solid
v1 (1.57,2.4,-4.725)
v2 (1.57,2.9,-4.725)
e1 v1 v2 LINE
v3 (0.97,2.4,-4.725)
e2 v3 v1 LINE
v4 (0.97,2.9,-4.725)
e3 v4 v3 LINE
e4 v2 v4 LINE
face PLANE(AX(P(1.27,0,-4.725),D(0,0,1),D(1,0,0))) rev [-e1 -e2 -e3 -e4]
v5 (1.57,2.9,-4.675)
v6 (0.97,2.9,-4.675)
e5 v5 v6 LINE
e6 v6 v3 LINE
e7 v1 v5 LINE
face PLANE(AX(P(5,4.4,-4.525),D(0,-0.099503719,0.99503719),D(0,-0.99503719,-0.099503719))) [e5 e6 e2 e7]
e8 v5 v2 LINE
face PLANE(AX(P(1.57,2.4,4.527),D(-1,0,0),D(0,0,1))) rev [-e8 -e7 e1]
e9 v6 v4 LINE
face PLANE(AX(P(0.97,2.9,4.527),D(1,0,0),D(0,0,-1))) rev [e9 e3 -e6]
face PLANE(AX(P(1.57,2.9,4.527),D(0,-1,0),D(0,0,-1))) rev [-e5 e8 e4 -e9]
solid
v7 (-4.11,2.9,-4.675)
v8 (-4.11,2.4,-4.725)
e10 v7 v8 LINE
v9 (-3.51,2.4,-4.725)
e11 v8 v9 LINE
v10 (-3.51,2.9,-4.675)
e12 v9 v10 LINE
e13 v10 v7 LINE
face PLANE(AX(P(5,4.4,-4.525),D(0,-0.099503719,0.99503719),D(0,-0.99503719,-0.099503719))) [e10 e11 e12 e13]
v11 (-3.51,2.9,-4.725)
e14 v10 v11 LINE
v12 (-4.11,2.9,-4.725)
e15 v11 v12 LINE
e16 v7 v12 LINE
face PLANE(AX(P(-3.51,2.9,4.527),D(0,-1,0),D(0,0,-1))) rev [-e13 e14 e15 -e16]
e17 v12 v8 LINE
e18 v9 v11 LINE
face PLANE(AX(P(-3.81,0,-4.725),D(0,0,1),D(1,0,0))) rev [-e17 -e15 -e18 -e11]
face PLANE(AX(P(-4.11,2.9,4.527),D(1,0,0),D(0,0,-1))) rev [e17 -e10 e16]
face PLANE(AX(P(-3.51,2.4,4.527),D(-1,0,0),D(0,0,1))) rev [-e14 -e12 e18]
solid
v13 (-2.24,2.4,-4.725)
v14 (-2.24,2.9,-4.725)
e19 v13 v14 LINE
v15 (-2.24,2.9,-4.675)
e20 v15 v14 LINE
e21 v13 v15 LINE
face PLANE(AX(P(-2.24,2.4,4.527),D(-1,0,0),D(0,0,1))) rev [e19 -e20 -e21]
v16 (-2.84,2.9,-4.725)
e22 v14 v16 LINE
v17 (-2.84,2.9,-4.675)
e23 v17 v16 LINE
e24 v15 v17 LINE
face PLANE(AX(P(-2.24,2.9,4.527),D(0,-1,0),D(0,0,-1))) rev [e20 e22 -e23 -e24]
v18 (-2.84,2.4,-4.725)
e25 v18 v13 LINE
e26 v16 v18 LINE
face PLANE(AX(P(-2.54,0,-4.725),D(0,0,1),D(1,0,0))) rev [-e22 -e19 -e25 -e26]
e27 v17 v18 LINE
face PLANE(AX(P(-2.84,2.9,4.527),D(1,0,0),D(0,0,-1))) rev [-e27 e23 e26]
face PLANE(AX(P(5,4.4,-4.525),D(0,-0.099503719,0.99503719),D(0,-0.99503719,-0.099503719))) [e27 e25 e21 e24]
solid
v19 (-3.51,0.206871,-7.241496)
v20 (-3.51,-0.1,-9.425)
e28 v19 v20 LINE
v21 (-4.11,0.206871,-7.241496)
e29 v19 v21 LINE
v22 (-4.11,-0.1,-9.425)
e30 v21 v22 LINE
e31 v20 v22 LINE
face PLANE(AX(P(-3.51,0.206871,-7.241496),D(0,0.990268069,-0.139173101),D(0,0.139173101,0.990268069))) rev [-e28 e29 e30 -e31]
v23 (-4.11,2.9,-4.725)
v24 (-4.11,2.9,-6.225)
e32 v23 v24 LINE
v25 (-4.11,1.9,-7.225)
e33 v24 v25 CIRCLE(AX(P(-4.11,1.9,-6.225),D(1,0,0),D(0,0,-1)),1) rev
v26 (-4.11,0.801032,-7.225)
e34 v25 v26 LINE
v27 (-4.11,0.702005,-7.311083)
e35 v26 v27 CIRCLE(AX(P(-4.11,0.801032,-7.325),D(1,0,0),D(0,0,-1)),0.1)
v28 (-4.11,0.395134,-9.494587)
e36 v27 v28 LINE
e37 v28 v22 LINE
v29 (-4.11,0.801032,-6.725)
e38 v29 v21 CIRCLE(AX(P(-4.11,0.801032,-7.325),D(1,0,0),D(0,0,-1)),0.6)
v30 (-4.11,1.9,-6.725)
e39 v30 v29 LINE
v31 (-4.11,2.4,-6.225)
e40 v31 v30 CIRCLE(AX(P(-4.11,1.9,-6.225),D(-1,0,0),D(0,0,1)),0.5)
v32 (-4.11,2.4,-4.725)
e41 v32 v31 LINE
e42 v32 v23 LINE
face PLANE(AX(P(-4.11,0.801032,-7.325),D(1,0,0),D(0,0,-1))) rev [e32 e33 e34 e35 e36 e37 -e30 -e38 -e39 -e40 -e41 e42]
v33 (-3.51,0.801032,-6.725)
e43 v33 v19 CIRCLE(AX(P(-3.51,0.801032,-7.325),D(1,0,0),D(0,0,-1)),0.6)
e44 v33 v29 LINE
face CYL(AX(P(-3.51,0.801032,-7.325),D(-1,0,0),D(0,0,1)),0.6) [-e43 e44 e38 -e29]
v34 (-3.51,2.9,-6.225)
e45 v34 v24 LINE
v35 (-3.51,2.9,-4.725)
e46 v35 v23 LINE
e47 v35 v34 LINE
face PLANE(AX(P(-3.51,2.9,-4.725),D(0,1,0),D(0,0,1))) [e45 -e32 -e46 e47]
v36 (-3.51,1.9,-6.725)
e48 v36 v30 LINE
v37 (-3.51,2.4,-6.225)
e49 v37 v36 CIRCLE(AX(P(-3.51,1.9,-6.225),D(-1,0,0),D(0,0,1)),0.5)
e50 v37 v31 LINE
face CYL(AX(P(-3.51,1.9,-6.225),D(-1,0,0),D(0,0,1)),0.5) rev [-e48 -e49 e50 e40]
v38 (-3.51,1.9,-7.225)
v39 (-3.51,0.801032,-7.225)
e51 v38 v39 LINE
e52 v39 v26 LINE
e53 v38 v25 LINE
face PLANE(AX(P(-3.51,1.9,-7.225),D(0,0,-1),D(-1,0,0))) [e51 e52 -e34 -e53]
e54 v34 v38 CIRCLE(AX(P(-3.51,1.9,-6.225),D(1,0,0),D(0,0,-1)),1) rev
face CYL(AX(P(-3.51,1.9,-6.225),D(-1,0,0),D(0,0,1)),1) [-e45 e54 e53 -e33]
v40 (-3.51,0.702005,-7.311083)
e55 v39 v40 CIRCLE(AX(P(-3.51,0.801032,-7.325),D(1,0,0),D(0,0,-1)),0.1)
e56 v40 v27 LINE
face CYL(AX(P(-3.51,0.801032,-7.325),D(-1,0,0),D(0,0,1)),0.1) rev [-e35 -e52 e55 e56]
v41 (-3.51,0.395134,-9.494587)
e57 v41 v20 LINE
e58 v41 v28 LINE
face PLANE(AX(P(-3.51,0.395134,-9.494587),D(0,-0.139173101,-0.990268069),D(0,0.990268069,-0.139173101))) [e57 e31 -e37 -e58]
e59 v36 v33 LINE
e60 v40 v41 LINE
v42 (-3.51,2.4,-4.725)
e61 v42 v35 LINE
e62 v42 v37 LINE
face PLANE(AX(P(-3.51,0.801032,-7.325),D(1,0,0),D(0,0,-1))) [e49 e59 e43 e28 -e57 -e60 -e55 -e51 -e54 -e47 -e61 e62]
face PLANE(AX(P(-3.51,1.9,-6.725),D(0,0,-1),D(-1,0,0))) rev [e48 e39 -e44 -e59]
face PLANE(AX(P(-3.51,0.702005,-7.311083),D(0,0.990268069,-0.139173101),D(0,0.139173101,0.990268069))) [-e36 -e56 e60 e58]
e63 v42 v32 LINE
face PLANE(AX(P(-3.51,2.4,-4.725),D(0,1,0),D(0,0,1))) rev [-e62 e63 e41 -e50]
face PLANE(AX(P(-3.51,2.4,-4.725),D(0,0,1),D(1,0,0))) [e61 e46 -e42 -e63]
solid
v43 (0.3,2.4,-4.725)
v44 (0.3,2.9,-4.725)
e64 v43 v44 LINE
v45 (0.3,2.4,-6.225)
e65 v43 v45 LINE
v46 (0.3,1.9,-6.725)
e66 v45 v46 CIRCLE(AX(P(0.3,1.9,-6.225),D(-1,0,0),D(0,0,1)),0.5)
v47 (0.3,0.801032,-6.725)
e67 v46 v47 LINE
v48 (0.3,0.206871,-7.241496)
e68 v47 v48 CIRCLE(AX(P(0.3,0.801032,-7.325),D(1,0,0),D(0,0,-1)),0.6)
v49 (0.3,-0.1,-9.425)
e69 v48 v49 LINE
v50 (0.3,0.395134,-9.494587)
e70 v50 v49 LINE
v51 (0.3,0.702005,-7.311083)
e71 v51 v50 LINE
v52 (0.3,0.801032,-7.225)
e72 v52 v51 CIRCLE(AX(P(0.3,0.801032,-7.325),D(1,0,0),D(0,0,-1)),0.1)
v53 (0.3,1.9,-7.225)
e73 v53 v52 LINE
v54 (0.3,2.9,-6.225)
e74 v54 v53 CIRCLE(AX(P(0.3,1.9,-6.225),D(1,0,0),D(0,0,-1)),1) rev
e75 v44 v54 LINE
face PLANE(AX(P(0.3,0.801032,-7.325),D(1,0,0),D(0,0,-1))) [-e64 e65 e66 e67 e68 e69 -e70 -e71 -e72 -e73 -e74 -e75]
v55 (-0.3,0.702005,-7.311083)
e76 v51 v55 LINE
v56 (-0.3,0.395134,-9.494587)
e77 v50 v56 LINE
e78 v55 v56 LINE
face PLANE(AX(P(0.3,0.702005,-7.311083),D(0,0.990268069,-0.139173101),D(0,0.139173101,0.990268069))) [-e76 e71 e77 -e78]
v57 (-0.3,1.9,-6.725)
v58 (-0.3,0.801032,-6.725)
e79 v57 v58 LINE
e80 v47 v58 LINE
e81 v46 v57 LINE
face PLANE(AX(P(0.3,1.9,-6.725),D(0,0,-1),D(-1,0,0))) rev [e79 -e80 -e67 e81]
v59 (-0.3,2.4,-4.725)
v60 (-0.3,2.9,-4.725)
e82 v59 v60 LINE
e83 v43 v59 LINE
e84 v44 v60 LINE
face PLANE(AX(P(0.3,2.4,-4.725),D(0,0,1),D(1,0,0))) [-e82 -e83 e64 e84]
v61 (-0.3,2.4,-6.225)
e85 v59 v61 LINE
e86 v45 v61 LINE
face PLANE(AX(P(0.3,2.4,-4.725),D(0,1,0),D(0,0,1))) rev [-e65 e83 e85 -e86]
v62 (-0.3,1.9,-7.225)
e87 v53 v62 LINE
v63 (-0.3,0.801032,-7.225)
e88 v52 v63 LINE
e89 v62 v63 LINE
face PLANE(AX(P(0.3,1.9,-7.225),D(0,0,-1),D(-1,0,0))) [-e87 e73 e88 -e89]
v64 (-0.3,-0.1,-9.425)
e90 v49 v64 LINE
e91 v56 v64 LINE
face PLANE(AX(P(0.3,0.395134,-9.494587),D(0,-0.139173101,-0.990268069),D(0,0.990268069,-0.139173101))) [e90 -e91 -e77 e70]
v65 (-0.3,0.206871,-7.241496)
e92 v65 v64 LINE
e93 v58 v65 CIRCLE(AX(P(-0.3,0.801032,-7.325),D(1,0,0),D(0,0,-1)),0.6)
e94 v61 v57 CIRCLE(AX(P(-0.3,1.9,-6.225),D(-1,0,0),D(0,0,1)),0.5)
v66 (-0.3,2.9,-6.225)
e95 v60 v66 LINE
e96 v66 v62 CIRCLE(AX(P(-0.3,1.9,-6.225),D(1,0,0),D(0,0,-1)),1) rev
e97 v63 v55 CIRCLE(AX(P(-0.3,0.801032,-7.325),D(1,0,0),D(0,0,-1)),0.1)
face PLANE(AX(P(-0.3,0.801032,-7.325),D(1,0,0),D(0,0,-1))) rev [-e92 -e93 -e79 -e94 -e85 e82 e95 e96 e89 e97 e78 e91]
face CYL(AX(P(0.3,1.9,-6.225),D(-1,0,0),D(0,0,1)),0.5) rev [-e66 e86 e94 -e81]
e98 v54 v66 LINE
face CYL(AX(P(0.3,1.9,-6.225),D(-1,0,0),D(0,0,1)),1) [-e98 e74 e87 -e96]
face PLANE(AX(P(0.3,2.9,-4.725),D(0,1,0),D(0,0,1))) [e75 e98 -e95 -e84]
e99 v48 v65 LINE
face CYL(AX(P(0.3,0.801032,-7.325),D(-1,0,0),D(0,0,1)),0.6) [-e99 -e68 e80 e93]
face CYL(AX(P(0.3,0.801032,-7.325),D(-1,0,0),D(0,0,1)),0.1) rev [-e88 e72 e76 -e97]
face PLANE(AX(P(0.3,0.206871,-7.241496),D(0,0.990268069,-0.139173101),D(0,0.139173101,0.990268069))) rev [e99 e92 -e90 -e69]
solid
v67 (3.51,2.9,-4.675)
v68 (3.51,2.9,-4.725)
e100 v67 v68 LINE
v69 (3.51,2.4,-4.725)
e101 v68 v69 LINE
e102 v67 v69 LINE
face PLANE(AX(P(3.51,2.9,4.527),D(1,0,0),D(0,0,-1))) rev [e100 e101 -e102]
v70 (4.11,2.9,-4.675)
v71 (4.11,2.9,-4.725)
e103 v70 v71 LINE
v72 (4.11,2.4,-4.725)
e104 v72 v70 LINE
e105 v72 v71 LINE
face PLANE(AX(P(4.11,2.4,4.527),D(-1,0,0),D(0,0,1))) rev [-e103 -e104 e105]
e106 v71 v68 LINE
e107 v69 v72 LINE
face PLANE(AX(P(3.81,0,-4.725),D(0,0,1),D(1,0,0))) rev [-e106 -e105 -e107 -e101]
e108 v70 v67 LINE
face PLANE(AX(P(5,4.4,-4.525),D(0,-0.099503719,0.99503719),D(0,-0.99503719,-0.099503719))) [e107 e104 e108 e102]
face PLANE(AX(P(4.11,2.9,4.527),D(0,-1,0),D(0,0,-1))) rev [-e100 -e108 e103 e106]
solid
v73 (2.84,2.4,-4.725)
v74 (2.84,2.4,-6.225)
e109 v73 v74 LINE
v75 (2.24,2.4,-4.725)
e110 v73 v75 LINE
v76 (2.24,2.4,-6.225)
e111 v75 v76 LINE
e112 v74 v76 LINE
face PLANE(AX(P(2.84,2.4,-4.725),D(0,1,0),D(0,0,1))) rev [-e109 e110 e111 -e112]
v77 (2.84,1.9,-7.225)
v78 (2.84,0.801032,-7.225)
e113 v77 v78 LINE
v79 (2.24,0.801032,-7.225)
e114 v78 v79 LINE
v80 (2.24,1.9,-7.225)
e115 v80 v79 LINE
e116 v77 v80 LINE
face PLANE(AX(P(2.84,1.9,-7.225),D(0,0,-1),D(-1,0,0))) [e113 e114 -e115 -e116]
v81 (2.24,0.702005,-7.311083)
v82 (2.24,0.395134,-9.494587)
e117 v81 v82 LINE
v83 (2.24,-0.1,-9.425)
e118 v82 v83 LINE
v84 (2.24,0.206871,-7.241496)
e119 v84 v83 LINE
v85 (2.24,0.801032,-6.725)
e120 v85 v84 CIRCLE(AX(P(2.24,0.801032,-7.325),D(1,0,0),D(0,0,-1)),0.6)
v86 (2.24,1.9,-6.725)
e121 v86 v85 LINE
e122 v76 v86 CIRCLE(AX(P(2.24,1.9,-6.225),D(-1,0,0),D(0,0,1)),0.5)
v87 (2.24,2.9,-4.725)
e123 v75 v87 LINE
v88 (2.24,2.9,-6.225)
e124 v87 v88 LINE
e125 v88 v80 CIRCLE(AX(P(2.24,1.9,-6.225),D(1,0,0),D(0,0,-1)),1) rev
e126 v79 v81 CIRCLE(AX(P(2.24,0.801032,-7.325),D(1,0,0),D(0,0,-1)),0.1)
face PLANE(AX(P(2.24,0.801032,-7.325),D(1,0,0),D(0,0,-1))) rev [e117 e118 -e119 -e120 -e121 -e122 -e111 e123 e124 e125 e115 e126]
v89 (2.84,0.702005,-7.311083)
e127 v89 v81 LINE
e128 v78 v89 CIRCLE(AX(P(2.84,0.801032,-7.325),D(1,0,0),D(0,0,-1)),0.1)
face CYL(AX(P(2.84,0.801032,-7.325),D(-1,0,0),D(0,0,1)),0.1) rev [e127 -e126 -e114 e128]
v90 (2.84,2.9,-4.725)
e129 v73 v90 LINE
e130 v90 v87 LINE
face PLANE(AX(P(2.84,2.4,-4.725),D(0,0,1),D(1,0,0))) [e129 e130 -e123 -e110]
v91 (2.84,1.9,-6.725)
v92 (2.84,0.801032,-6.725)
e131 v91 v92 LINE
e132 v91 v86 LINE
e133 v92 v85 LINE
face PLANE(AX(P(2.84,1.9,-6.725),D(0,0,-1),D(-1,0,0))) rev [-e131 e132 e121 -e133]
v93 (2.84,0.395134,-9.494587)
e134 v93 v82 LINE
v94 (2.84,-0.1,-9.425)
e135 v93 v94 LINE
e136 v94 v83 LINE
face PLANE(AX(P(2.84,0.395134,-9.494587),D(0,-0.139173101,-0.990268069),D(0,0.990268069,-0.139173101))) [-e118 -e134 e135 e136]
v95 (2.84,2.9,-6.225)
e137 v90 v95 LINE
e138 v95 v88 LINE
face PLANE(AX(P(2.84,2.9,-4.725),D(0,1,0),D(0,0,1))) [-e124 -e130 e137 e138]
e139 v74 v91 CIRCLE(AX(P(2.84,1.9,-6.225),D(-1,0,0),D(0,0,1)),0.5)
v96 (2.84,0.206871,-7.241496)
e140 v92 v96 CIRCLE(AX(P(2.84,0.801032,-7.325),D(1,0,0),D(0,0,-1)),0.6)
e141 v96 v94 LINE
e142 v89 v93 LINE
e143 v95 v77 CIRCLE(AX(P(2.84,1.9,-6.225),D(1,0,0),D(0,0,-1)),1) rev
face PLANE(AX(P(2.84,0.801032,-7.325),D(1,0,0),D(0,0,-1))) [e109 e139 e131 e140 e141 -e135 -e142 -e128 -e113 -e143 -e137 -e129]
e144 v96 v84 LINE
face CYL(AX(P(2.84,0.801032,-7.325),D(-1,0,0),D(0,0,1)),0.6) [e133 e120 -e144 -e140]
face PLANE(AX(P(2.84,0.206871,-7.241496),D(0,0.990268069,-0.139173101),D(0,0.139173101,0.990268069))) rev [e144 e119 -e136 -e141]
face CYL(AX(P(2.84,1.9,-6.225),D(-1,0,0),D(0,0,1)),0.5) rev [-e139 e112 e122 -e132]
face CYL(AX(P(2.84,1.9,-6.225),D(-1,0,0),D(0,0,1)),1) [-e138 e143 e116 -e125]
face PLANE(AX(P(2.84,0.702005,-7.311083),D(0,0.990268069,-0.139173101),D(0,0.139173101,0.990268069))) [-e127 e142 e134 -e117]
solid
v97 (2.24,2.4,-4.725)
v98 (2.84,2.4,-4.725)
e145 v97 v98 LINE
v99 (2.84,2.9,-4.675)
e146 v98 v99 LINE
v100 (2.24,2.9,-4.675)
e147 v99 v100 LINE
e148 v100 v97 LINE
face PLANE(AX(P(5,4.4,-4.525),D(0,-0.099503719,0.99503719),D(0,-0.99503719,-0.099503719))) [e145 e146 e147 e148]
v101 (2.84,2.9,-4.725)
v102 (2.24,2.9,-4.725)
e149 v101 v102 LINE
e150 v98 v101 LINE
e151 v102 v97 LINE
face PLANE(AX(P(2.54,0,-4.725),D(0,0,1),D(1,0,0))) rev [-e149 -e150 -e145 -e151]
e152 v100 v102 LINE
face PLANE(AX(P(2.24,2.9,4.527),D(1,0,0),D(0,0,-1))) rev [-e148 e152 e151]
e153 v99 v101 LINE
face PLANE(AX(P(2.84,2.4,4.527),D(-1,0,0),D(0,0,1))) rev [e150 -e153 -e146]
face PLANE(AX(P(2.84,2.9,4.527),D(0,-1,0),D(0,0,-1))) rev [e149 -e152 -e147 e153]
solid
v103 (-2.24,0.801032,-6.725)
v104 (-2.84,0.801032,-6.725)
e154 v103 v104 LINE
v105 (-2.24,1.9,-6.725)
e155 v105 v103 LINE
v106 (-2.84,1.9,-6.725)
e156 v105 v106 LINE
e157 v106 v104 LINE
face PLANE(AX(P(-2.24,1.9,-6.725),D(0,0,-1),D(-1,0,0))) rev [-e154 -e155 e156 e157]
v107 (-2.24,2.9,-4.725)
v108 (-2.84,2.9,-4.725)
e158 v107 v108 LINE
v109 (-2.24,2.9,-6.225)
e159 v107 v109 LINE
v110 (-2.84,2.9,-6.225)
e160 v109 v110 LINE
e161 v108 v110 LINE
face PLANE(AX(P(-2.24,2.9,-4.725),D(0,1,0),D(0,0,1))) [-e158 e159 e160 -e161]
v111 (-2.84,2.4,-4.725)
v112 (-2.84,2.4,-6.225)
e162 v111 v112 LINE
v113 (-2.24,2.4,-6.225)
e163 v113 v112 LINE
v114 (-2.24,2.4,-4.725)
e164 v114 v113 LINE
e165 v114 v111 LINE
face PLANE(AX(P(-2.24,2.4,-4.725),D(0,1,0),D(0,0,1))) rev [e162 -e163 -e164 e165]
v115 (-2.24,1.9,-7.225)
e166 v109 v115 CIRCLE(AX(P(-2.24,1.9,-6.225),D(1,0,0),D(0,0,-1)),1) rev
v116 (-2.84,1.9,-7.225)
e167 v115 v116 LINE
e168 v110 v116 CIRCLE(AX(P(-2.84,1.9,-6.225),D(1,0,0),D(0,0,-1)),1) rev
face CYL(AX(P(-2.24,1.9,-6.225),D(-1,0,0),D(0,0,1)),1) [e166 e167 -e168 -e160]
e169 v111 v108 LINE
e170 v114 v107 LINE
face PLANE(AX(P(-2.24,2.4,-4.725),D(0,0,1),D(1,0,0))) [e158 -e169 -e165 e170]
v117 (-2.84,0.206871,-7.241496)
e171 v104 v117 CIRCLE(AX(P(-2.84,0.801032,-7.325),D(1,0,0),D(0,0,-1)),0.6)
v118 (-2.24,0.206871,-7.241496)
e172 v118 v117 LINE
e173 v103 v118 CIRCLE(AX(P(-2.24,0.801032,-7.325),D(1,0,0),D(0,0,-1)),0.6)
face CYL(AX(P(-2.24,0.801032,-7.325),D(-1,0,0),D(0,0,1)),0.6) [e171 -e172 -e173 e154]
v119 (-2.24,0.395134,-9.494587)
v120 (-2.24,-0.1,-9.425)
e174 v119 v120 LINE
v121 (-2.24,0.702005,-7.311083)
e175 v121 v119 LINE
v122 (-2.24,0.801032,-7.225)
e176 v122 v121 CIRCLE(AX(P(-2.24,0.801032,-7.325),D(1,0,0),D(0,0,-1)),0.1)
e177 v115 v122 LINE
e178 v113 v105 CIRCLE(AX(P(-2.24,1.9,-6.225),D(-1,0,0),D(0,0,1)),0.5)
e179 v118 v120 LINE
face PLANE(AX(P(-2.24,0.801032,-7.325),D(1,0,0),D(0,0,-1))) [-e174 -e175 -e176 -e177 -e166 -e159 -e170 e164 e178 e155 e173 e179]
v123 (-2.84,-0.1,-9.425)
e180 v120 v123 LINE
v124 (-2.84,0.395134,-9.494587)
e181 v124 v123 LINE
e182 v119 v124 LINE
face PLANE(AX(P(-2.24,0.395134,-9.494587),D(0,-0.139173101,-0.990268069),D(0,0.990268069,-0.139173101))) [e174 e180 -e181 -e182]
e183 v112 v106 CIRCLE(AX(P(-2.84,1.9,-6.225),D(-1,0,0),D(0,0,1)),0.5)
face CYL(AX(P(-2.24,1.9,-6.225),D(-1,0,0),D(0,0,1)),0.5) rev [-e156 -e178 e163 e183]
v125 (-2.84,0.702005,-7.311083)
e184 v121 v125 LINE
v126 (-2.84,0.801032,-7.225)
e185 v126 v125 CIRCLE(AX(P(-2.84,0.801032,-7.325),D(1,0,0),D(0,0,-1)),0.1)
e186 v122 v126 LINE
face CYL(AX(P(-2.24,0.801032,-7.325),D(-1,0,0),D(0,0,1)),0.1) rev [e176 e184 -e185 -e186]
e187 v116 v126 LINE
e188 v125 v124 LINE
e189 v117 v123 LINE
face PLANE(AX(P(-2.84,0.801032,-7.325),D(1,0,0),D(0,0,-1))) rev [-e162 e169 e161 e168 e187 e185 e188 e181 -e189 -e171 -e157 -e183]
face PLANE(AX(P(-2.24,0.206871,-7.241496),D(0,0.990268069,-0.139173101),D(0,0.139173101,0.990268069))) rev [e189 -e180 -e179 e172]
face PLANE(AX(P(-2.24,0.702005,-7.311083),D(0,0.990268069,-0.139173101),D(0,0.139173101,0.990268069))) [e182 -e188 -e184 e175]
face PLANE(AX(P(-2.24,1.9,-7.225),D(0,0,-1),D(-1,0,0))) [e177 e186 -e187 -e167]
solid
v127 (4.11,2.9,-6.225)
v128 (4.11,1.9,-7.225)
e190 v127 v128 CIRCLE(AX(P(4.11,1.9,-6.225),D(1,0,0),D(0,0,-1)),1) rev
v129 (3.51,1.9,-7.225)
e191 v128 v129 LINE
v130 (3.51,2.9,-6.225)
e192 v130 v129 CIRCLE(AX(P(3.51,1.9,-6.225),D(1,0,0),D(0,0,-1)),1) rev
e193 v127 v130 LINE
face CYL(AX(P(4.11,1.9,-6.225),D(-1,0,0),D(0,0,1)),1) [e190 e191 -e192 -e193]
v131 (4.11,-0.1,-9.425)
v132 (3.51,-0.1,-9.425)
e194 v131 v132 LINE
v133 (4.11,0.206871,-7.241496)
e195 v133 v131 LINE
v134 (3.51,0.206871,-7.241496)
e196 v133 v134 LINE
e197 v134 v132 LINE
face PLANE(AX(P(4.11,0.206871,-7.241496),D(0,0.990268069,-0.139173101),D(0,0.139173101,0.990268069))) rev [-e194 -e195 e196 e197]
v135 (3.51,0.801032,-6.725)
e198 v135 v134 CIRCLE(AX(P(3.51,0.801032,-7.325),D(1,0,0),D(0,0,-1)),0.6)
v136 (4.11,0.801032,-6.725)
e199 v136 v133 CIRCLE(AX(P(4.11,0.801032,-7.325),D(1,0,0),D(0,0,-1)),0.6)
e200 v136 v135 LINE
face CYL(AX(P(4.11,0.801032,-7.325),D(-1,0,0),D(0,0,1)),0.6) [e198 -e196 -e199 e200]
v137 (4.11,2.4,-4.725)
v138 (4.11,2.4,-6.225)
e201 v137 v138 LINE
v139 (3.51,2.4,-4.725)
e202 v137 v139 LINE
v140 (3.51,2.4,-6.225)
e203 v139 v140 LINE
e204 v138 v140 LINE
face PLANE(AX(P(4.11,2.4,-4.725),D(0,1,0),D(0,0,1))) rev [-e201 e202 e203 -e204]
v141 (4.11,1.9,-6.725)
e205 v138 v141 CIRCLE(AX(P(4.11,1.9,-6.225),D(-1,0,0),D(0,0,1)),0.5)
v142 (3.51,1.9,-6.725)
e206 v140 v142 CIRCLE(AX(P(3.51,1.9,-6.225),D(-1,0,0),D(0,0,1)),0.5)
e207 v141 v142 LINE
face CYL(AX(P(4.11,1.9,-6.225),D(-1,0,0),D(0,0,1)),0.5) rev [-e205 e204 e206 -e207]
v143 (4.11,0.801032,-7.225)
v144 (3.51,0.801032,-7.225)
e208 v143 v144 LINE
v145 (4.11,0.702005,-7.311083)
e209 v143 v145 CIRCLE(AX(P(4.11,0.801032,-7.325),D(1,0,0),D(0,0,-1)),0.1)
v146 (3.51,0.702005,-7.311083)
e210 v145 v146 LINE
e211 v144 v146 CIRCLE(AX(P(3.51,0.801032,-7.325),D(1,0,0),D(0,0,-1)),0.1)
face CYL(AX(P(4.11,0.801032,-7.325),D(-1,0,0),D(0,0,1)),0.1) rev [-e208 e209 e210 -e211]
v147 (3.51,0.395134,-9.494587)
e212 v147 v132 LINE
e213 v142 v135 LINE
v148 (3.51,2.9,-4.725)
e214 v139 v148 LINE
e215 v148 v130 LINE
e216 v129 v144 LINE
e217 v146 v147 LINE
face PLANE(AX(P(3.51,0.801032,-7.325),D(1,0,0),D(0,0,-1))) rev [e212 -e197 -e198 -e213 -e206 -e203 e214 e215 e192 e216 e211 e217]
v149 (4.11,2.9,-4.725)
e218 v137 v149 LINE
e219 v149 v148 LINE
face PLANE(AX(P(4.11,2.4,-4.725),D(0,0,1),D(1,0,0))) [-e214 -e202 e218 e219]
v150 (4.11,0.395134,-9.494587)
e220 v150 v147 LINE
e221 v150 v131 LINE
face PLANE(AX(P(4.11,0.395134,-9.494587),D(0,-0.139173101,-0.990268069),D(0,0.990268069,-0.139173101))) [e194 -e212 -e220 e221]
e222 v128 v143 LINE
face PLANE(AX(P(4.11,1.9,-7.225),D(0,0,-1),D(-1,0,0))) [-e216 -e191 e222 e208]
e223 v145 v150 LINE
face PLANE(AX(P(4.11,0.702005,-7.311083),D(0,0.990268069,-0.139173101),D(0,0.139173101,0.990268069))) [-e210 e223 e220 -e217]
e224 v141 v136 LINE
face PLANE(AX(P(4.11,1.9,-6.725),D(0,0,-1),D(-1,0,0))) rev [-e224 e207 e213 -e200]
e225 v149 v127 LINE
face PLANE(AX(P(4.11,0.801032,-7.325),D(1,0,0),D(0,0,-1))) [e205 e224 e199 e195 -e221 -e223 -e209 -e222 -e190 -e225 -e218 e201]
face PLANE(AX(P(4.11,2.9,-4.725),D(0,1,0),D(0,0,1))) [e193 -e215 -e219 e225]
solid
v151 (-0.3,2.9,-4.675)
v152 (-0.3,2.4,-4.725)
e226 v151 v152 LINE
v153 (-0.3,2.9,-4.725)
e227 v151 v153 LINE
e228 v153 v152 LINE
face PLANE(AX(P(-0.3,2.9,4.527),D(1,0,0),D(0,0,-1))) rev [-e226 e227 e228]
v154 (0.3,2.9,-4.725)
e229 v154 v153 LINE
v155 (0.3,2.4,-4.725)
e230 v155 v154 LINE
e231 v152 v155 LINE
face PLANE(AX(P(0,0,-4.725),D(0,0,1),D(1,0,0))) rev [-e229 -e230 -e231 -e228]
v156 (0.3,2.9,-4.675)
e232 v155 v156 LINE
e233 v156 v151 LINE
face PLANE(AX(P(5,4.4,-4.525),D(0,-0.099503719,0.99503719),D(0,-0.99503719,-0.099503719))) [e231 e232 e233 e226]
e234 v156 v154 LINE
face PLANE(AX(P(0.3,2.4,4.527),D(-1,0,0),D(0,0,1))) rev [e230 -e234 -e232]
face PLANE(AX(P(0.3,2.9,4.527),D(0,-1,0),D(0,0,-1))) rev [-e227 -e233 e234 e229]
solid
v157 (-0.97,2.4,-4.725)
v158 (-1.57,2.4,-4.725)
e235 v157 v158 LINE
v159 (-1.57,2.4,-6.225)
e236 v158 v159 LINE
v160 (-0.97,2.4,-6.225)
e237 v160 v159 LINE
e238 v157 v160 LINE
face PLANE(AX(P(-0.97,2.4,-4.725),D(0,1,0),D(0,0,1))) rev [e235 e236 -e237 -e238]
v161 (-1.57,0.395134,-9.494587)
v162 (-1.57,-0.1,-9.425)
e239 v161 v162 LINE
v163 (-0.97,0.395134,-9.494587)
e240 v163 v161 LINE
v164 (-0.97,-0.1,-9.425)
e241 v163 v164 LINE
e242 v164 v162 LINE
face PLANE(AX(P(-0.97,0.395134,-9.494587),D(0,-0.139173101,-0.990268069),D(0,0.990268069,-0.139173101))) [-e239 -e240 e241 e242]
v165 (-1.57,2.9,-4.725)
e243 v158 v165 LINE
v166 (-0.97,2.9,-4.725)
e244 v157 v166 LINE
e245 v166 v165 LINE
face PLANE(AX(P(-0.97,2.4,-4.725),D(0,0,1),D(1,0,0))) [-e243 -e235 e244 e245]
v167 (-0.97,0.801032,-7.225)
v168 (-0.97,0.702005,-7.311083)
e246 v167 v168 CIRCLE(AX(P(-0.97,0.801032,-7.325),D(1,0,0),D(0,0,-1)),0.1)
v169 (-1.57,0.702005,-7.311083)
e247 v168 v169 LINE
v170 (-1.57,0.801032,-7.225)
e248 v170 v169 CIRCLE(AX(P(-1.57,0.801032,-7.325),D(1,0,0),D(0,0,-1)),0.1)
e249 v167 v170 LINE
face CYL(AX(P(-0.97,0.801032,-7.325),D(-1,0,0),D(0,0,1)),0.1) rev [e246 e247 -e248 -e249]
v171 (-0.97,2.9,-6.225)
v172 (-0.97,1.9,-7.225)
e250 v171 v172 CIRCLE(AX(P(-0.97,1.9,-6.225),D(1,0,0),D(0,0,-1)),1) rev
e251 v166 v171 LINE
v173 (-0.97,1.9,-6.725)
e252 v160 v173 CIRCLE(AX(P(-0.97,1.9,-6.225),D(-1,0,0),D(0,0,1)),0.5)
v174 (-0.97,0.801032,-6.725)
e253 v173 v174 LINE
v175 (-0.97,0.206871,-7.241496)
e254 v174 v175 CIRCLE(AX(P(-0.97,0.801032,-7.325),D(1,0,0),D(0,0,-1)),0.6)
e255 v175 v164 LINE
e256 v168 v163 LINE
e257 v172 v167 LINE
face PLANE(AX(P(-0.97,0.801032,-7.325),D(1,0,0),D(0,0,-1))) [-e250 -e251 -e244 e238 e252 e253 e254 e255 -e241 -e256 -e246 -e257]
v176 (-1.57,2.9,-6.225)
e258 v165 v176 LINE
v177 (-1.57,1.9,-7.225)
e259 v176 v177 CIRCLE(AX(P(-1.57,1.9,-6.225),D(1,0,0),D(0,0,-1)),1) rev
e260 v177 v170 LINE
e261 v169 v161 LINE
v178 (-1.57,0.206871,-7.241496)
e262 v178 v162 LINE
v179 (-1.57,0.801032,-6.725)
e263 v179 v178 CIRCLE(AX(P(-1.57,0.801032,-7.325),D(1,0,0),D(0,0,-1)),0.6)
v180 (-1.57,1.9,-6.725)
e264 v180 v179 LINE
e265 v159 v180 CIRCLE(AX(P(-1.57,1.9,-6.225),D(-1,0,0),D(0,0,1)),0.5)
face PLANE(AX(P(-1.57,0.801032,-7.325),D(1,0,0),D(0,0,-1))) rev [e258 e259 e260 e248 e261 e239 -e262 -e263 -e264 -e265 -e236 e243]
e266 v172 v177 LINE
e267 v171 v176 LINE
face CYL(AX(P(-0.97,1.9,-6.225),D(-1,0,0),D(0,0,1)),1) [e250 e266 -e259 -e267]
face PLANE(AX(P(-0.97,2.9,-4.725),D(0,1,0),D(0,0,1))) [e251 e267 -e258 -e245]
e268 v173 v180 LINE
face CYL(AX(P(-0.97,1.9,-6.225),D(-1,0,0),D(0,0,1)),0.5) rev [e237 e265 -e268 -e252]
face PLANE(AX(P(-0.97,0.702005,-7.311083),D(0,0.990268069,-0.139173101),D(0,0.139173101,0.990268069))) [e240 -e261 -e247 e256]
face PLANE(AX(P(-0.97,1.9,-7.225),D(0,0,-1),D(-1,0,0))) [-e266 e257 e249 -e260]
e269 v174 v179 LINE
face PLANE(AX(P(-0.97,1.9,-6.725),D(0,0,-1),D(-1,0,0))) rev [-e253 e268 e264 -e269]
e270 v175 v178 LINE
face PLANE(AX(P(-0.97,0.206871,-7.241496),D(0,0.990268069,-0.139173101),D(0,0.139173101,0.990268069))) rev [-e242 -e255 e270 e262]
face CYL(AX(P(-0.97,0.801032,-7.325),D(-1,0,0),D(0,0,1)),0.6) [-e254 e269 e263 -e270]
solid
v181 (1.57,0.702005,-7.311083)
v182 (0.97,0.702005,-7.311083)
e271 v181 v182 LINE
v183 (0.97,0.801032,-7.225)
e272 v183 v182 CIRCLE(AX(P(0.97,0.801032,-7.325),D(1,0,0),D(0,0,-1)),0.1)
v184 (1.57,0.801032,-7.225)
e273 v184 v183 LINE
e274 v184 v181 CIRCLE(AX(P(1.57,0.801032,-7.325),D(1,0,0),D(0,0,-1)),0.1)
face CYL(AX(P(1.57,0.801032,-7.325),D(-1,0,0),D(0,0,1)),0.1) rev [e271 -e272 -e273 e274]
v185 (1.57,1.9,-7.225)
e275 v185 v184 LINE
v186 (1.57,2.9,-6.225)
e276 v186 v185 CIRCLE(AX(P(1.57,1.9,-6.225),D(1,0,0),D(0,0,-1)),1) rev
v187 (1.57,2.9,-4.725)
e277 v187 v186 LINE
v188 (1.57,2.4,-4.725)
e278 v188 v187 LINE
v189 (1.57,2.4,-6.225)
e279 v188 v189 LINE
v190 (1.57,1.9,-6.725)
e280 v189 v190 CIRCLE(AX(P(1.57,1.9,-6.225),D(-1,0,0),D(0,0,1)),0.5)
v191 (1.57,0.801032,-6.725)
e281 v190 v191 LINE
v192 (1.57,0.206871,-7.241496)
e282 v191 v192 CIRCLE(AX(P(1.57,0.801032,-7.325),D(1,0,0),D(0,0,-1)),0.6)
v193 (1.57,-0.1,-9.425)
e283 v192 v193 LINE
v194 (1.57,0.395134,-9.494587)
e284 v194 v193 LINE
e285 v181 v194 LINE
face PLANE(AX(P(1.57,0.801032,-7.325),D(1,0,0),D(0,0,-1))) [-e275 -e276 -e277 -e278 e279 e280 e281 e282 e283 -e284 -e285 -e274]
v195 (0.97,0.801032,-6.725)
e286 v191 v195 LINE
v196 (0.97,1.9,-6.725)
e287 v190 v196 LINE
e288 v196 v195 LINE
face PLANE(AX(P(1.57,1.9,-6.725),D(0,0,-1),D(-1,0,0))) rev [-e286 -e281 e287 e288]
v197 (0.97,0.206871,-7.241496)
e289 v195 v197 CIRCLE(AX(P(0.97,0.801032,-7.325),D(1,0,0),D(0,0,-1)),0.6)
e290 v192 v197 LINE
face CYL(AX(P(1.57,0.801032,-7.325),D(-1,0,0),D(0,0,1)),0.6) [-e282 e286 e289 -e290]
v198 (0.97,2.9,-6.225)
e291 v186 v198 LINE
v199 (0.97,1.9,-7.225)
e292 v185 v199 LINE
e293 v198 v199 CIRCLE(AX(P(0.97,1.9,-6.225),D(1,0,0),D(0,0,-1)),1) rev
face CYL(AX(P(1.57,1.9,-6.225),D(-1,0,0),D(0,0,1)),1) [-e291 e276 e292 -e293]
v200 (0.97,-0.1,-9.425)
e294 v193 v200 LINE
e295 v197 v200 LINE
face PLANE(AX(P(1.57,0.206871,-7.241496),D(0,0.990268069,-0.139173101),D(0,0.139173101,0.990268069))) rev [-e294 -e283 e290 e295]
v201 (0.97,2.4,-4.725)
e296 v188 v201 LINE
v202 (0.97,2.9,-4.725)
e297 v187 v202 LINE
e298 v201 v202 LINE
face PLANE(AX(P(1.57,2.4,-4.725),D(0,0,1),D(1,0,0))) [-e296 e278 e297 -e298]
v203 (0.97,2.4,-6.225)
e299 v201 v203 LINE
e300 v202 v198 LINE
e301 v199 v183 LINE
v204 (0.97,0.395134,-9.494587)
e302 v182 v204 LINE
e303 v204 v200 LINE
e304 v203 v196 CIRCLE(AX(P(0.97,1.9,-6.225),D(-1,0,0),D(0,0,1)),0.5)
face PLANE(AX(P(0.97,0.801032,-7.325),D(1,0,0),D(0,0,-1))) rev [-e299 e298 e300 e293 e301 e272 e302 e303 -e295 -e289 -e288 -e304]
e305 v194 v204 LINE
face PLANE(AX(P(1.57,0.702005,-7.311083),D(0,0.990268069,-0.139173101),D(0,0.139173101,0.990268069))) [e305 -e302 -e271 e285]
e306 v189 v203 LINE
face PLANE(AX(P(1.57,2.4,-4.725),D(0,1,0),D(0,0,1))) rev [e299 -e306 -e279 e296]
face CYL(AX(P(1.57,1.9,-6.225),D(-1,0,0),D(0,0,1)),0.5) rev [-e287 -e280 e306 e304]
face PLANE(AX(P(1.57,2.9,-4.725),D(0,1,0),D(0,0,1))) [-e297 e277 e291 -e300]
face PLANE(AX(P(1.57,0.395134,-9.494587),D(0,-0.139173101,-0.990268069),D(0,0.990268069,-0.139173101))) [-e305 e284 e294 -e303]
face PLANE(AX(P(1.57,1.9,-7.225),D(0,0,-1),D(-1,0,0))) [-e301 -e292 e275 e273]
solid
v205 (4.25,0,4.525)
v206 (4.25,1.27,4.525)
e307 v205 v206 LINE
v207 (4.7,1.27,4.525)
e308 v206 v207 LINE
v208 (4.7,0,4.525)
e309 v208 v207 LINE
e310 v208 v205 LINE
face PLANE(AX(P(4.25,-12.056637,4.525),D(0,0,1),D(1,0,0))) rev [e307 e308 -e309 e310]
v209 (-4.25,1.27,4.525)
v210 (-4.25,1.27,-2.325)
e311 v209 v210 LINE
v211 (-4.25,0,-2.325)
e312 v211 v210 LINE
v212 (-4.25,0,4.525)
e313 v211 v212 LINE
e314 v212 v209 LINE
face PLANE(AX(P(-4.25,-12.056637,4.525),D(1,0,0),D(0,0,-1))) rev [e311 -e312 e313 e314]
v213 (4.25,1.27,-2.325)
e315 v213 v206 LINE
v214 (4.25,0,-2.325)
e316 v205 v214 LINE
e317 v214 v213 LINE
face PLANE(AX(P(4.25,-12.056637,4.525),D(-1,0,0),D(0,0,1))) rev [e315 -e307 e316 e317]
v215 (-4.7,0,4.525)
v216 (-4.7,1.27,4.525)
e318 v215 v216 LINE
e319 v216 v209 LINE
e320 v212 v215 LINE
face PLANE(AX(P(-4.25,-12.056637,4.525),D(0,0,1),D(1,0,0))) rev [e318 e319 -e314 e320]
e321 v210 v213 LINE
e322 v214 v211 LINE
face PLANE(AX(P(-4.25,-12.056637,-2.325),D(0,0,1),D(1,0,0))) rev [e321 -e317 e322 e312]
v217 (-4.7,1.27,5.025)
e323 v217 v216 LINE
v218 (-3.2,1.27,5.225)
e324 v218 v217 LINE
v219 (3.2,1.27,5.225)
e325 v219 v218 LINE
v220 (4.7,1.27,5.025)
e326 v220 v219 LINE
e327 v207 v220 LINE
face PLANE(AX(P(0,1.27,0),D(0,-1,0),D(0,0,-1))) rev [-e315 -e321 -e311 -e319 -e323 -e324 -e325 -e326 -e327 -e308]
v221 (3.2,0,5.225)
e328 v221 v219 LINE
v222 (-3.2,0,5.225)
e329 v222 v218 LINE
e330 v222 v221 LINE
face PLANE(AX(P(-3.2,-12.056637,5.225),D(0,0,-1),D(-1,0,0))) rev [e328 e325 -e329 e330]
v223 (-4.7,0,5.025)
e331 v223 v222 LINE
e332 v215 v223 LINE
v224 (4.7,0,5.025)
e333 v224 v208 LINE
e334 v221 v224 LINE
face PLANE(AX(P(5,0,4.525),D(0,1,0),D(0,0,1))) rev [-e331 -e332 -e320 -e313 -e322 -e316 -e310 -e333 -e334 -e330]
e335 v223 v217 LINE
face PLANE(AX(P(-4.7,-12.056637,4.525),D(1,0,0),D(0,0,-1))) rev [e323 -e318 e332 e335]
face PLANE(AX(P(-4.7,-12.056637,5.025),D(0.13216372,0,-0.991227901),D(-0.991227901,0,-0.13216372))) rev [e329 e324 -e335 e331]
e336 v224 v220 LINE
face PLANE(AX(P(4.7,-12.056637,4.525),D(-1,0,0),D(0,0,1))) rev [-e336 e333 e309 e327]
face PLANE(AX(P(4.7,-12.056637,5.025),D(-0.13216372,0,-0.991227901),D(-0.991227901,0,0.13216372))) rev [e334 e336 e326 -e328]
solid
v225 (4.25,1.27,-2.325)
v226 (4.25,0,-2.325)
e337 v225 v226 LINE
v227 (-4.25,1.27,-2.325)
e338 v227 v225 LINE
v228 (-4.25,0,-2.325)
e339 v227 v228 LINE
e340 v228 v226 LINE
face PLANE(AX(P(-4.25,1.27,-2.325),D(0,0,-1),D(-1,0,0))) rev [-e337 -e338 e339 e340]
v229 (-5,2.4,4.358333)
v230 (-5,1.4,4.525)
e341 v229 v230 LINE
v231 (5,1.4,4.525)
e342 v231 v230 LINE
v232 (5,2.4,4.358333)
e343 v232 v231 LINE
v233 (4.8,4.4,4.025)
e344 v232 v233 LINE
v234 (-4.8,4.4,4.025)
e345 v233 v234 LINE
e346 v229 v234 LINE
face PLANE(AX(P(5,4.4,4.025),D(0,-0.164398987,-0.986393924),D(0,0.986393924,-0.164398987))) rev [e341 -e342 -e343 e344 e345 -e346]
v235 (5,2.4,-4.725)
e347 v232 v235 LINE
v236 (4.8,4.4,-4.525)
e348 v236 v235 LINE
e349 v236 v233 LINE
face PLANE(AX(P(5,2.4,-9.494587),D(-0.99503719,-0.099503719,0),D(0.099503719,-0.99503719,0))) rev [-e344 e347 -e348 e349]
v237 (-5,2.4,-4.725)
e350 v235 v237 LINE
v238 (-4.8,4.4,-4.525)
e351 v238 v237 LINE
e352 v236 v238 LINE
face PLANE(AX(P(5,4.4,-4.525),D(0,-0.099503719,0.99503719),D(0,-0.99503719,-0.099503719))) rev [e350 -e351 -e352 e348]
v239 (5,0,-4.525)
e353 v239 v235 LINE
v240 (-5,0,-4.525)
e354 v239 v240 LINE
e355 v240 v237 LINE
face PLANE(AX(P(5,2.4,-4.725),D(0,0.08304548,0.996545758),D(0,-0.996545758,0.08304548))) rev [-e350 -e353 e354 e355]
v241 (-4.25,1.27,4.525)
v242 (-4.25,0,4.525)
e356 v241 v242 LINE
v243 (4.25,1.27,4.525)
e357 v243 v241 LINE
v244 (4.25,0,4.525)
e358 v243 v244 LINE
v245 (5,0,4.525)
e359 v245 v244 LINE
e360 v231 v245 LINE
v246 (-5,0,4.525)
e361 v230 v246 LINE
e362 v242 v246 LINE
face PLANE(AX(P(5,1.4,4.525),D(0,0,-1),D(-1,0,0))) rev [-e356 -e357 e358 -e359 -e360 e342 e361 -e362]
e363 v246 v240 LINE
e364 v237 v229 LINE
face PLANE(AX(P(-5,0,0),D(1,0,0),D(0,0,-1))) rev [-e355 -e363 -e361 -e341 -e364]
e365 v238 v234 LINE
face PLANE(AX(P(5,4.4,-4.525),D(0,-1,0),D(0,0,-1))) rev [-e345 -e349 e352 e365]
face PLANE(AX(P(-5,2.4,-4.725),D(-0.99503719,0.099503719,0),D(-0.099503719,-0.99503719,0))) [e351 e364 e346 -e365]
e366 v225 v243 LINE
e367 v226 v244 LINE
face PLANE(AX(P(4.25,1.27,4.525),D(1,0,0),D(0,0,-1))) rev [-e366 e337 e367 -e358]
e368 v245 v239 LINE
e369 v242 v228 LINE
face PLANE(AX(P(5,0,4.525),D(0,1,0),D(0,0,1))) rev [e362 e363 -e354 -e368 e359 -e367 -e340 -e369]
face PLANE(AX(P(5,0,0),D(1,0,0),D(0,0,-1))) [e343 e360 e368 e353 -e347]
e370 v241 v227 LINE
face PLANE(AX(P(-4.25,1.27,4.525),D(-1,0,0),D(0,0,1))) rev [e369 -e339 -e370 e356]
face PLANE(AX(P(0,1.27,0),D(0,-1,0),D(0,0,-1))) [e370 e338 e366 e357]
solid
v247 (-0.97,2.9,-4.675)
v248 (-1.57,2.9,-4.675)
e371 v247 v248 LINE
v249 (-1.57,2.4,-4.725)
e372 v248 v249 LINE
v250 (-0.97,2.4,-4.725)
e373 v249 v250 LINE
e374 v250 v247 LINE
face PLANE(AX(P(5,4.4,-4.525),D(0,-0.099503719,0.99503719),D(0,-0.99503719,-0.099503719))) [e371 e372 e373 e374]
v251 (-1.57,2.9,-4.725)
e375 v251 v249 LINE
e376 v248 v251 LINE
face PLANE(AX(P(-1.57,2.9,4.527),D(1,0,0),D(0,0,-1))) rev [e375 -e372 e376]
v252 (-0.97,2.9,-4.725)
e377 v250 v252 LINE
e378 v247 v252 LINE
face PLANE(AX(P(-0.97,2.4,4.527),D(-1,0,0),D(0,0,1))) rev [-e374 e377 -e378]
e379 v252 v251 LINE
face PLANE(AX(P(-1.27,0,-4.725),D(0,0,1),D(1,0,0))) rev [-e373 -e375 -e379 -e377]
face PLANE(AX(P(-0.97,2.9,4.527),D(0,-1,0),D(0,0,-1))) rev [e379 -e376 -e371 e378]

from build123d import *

# Parameters (mm, degrees)
MAIN_BODY_DEPTH               = 5
ICP_CUT_W                     = 8.5
ICP_CUT_H                     = 6.85
BACK_IC_PLATE_CUT_DEPTH       = 1.27
BACK_IC_PLATE_DEPTH           = 1.27
IC_LEG_DEPTH                  = 0.3
IC_LEG_JOINT_COMPLETION_REACH = 13.973
LC_W                          = 0.6
LC_H                          = 0.5
SIDE_CHAMFER_DEPTH            = 12.597722784
LP_START                      = 3.51
LP_IC_LEGS_DEPTH              = 0.6
LP_START_2                    = 2.24
LP_IC_LEGS_2_DEPTH            = 0.6
LP_START_3                    = 0.97
LP_IC_LEGS_3_DEPTH            = 0.6
LP_START_4                    = -4.11
LP_IC_LEGS_4_DEPTH            = 0.6
LP_START_5                    = -2.84
LP_IC_LEGS_5_DEPTH            = 0.6
LP_START_6                    = -1.57
LP_IC_LEGS_6_DEPTH            = 0.6
LP_IC_LEGS_7_DEPTH            = 0.6
LP_IC_LEGS_8_DEPTH            = 0.6
LP_IC_LEGS_9_DEPTH            = 0.6
LP_IC_LEGS_10_DEPTH           = 0.6
LP_IC_LEGS_11_DEPTH           = 0.6
LP_IC_LEGS_12_DEPTH           = 0.6


# Read off the part's stored shape, not the designer's step: LP IC LEGS
with BuildPart() as part:
    # MB → MAIN BODY (new, symmetric)
    with BuildSketch(Plane(origin=(0, 0, 0), x_dir=(0, 0, -1), z_dir=(1, 0, 0))):
        Polygon((4.525, 4.4), (-4.025, 4.4), (-4.525, 1.4), (-4.525, 0), (4.525, 0), (4.725, 2.4), align=None)
    extrude(amount=MAIN_BODY_DEPTH, both=True)

    # ICP CUT → BACK IC PLATE CUT (cut)
    with BuildSketch(Plane(origin=(0, 0, 0), x_dir=(-1, 0, 0), z_dir=(0, -1, 0))):
        with Locations((0, -1.1)):
            Rectangle(ICP_CUT_W, ICP_CUT_H)
    extrude(amount=-BACK_IC_PLATE_CUT_DEPTH, mode=Mode.SUBTRACT)


with BuildPart() as body_2:
    # ICP → BACK IC PLATE (new body)
    with BuildSketch(Plane.XZ.offset(-1.27)):
        Polygon((-4.25, 4.525), (-4.7, 4.525), (-4.7, 5.025), (-3.2, 5.225), (3.2, 5.225), (4.7, 5.025), (4.7, 4.525), (4.25, 4.525), (4.25, -2.325), (-4.25, -2.325), align=None)
    extrude(amount=BACK_IC_PLATE_DEPTH)


with BuildPart() as body_3:
    # Sketch3 → IC LEG (new, symmetric)
    with BuildSketch(Plane(origin=(0, 0, 0), x_dir=(0, 0, -1), z_dir=(1, 0, 0))):
        with BuildLine():
            Line((4.725, 2.4), (6.225, 2.4))
            ThreePointArc((6.225, 2.4), (6.578553391, 2.253553391), (6.725, 1.9))
            Line((6.725, 1.9), (6.725, 0.801032296))
            ThreePointArc((6.725, 0.801032296), (6.872174252, 0.407396879), (7.241496139, 0.206871455))
            Line((7.241496139, 0.206871455), (9.425, -0.1))
            Line((9.425, -0.1), (9.49458655, 0.395134034))
            Line((9.49458655, 0.395134034), (7.31108269, 0.70200549))
            ThreePointArc((7.31108269, 0.70200549), (7.249529042, 0.735426393), (7.225, 0.801032296))
            Line((7.225, 0.801032296), (7.225, 1.9))
            ThreePointArc((7.225, 1.9), (6.932106781, 2.607106781), (6.225, 2.9))
            Line((6.225, 2.9), (4.725, 2.9))
            Line((4.725, 2.9), (4.725, 2.4))
        make_face()
    extrude(amount=IC_LEG_DEPTH, both=True)


with BuildPart() as body_4:

    # LC → IC LEG JOINT COMPLETION (new, up to next)
    with BuildSketch(Plane.XY.offset(-4.725), mode=Mode.PRIVATE) as ic_leg_joint_completion_sk1:
        with Locations((0, 2.65)):
            Rectangle(LC_W, LC_H)
    ic_leg_joint_completion_tool1 = extrude(ic_leg_joint_completion_sk1.sketch, amount=IC_LEG_JOINT_COMPLETION_REACH, mode=Mode.PRIVATE) - part.part
    add(ic_leg_joint_completion_tool1.solids().sort_by_distance((0, 2.65, -4.725))[0])


with BuildPart() as part_1:
    add(part.part)

    # CHAMFER CUTS → SIDE CHAMFER (cut, symmetric)
    with BuildSketch(Plane.XY):
        Polygon((4.8, 4.4), (5, 4.4), (5, 2.4), align=None)
    side_chamfer = extrude(amount=SIDE_CHAMFER_DEPTH, both=True, mode=Mode.SUBTRACT)

    # SC M: SIDE CHAMFER across plane
    add(side_chamfer.mirror(Plane(origin=(0, 0, 0), x_dir=(0, 0, 1), z_dir=(1, 0, 0))), mode=Mode.SUBTRACT)


with BuildPart() as body_5:
    # LP IC LEGS outline → LP IC LEGS (new body)
    with BuildSketch(Plane.YZ.offset(LP_START)):
        Polygon((2.9, -4.725), (2.9, -4.675), (2.4, -4.725), align=None)
    extrude(amount=LP_IC_LEGS_DEPTH)


with BuildPart() as body_6:
    # LP IC LEGS 2 outline → LP IC LEGS 2 (new body)
    with BuildSketch(Plane.YZ.offset(LP_START_2)):
        Polygon((2.9, -4.725), (2.9, -4.675), (2.4, -4.725), align=None)
    extrude(amount=LP_IC_LEGS_2_DEPTH)


with BuildPart() as body_7:
    # LP IC LEGS 3 outline → LP IC LEGS 3 (new body)
    with BuildSketch(Plane.YZ.offset(LP_START_3)):
        Polygon((2.9, -4.725), (2.9, -4.675), (2.4, -4.725), align=None)
    extrude(amount=LP_IC_LEGS_3_DEPTH)


with BuildPart() as body_8:
    # LP IC LEGS 4 outline → LP IC LEGS 4 (new body)
    with BuildSketch(Plane.YZ.offset(LP_START_4)):
        Polygon((2.9, -4.725), (2.9, -4.675), (2.4, -4.725), align=None)
    extrude(amount=LP_IC_LEGS_4_DEPTH)


with BuildPart() as body_9:
    # LP IC LEGS 5 outline → LP IC LEGS 5 (new body)
    with BuildSketch(Plane.YZ.offset(LP_START_5)):
        Polygon((2.9, -4.725), (2.9, -4.675), (2.4, -4.725), align=None)
    extrude(amount=LP_IC_LEGS_5_DEPTH)


with BuildPart() as body_10:
    # LP IC LEGS 6 outline → LP IC LEGS 6 (new body)
    with BuildSketch(Plane.YZ.offset(LP_START_6)):
        Polygon((2.9, -4.725), (2.9, -4.675), (2.4, -4.725), align=None)
    extrude(amount=LP_IC_LEGS_6_DEPTH)


with BuildPart() as body_11:
    # LP IC LEGS 7 outline → LP IC LEGS 7 (new body)
    with BuildSketch(Plane.YZ.offset(LP_START)):
        with BuildLine():
            Line((0.206871455, -7.241496139), (-0.1, -9.425))
            Line((-0.1, -9.425), (0.395134034, -9.49458655))
            Line((0.395134034, -9.49458655), (0.70200549, -7.31108269))
            ThreePointArc((0.70200549, -7.31108269), (0.735426393, -7.249529042), (0.801032296, -7.225))
            Line((0.801032296, -7.225), (1.9, -7.225))
            ThreePointArc((1.9, -7.225), (2.607106781, -6.932106781), (2.9, -6.225))
            Line((2.9, -6.225), (2.9, -4.725))
            Line((2.9, -4.725), (2.4, -4.725))
            Line((2.4, -4.725), (2.4, -6.225))
            ThreePointArc((2.4, -6.225), (2.253553391, -6.578553391), (1.9, -6.725))
            Line((1.9, -6.725), (0.801032296, -6.725))
            ThreePointArc((0.801032296, -6.725), (0.407396879, -6.872174252), (0.206871455, -7.241496139))
        make_face()
    extrude(amount=LP_IC_LEGS_7_DEPTH)


with BuildPart() as body_12:
    # LP IC LEGS 8 outline → LP IC LEGS 8 (new body)
    with BuildSketch(Plane.YZ.offset(LP_START_2)):
        with BuildLine():
            Line((0.206871455, -7.241496139), (-0.1, -9.425))
            Line((-0.1, -9.425), (0.395134034, -9.49458655))
            Line((0.395134034, -9.49458655), (0.70200549, -7.31108269))
            ThreePointArc((0.70200549, -7.31108269), (0.735426393, -7.249529042), (0.801032296, -7.225))
            Line((0.801032296, -7.225), (1.9, -7.225))
            ThreePointArc((1.9, -7.225), (2.607106781, -6.932106781), (2.9, -6.225))
            Line((2.9, -6.225), (2.9, -4.725))
            Line((2.9, -4.725), (2.4, -4.725))
            Line((2.4, -4.725), (2.4, -6.225))
            ThreePointArc((2.4, -6.225), (2.253553391, -6.578553391), (1.9, -6.725))
            Line((1.9, -6.725), (0.801032296, -6.725))
            ThreePointArc((0.801032296, -6.725), (0.407396879, -6.872174252), (0.206871455, -7.241496139))
        make_face()
    extrude(amount=LP_IC_LEGS_8_DEPTH)


with BuildPart() as body_13:
    # LP IC LEGS 9 outline → LP IC LEGS 9 (new body)
    with BuildSketch(Plane.YZ.offset(LP_START_3)):
        with BuildLine():
            Line((0.206871455, -7.241496139), (-0.1, -9.425))
            Line((-0.1, -9.425), (0.395134034, -9.49458655))
            Line((0.395134034, -9.49458655), (0.70200549, -7.31108269))
            ThreePointArc((0.70200549, -7.31108269), (0.735426393, -7.249529042), (0.801032296, -7.225))
            Line((0.801032296, -7.225), (1.9, -7.225))
            ThreePointArc((1.9, -7.225), (2.607106781, -6.932106781), (2.9, -6.225))
            Line((2.9, -6.225), (2.9, -4.725))
            Line((2.9, -4.725), (2.4, -4.725))
            Line((2.4, -4.725), (2.4, -6.225))
            ThreePointArc((2.4, -6.225), (2.253553391, -6.578553391), (1.9, -6.725))
            Line((1.9, -6.725), (0.801032296, -6.725))
            ThreePointArc((0.801032296, -6.725), (0.407396879, -6.872174252), (0.206871455, -7.241496139))
        make_face()
    extrude(amount=LP_IC_LEGS_9_DEPTH)


with BuildPart() as body_14:
    # LP IC LEGS 10 outline → LP IC LEGS 10 (new body)
    with BuildSketch(Plane.YZ.offset(LP_START_4)):
        with BuildLine():
            Line((0.206871455, -7.241496139), (-0.1, -9.425))
            Line((-0.1, -9.425), (0.395134034, -9.49458655))
            Line((0.395134034, -9.49458655), (0.70200549, -7.31108269))
            ThreePointArc((0.70200549, -7.31108269), (0.735426393, -7.249529042), (0.801032296, -7.225))
            Line((0.801032296, -7.225), (1.9, -7.225))
            ThreePointArc((1.9, -7.225), (2.607106781, -6.932106781), (2.9, -6.225))
            Line((2.9, -6.225), (2.9, -4.725))
            Line((2.9, -4.725), (2.4, -4.725))
            Line((2.4, -4.725), (2.4, -6.225))
            ThreePointArc((2.4, -6.225), (2.253553391, -6.578553391), (1.9, -6.725))
            Line((1.9, -6.725), (0.801032296, -6.725))
            ThreePointArc((0.801032296, -6.725), (0.407396879, -6.872174252), (0.206871455, -7.241496139))
        make_face()
    extrude(amount=LP_IC_LEGS_10_DEPTH)


with BuildPart() as body_15:
    # LP IC LEGS 11 outline → LP IC LEGS 11 (new body)
    with BuildSketch(Plane.YZ.offset(LP_START_5)):
        with BuildLine():
            Line((0.206871455, -7.241496139), (-0.1, -9.425))
            Line((-0.1, -9.425), (0.395134034, -9.49458655))
            Line((0.395134034, -9.49458655), (0.70200549, -7.31108269))
            ThreePointArc((0.70200549, -7.31108269), (0.735426393, -7.249529042), (0.801032296, -7.225))
            Line((0.801032296, -7.225), (1.9, -7.225))
            ThreePointArc((1.9, -7.225), (2.607106781, -6.932106781), (2.9, -6.225))
            Line((2.9, -6.225), (2.9, -4.725))
            Line((2.9, -4.725), (2.4, -4.725))
            Line((2.4, -4.725), (2.4, -6.225))
            ThreePointArc((2.4, -6.225), (2.253553391, -6.578553391), (1.9, -6.725))
            Line((1.9, -6.725), (0.801032296, -6.725))
            ThreePointArc((0.801032296, -6.725), (0.407396879, -6.872174252), (0.206871455, -7.241496139))
        make_face()
    extrude(amount=LP_IC_LEGS_11_DEPTH)


with BuildPart() as body_16:
    # LP IC LEGS 12 outline → LP IC LEGS 12 (new body)
    with BuildSketch(Plane.YZ.offset(LP_START_6)):
        with BuildLine():
            Line((0.206871455, -7.241496139), (-0.1, -9.425))
            Line((-0.1, -9.425), (0.395134034, -9.49458655))
            Line((0.395134034, -9.49458655), (0.70200549, -7.31108269))
            ThreePointArc((0.70200549, -7.31108269), (0.735426393, -7.249529042), (0.801032296, -7.225))
            Line((0.801032296, -7.225), (1.9, -7.225))
            ThreePointArc((1.9, -7.225), (2.607106781, -6.932106781), (2.9, -6.225))
            Line((2.9, -6.225), (2.9, -4.725))
            Line((2.9, -4.725), (2.4, -4.725))
            Line((2.4, -4.725), (2.4, -6.225))
            ThreePointArc((2.4, -6.225), (2.253553391, -6.578553391), (1.9, -6.725))
            Line((1.9, -6.725), (0.801032296, -6.725))
            ThreePointArc((0.801032296, -6.725), (0.407396879, -6.872174252), (0.206871455, -7.241496139))
        make_face()
    extrude(amount=LP_IC_LEGS_12_DEPTH)


solid = Compound([body_2.part, body_3.part, body_4.part, part_1.part, body_5.part, body_6.part, body_7.part, body_8.part, body_9.part, body_10.part, body_11.part, body_12.part, body_13.part, body_14.part, body_15.part, body_16.part])
